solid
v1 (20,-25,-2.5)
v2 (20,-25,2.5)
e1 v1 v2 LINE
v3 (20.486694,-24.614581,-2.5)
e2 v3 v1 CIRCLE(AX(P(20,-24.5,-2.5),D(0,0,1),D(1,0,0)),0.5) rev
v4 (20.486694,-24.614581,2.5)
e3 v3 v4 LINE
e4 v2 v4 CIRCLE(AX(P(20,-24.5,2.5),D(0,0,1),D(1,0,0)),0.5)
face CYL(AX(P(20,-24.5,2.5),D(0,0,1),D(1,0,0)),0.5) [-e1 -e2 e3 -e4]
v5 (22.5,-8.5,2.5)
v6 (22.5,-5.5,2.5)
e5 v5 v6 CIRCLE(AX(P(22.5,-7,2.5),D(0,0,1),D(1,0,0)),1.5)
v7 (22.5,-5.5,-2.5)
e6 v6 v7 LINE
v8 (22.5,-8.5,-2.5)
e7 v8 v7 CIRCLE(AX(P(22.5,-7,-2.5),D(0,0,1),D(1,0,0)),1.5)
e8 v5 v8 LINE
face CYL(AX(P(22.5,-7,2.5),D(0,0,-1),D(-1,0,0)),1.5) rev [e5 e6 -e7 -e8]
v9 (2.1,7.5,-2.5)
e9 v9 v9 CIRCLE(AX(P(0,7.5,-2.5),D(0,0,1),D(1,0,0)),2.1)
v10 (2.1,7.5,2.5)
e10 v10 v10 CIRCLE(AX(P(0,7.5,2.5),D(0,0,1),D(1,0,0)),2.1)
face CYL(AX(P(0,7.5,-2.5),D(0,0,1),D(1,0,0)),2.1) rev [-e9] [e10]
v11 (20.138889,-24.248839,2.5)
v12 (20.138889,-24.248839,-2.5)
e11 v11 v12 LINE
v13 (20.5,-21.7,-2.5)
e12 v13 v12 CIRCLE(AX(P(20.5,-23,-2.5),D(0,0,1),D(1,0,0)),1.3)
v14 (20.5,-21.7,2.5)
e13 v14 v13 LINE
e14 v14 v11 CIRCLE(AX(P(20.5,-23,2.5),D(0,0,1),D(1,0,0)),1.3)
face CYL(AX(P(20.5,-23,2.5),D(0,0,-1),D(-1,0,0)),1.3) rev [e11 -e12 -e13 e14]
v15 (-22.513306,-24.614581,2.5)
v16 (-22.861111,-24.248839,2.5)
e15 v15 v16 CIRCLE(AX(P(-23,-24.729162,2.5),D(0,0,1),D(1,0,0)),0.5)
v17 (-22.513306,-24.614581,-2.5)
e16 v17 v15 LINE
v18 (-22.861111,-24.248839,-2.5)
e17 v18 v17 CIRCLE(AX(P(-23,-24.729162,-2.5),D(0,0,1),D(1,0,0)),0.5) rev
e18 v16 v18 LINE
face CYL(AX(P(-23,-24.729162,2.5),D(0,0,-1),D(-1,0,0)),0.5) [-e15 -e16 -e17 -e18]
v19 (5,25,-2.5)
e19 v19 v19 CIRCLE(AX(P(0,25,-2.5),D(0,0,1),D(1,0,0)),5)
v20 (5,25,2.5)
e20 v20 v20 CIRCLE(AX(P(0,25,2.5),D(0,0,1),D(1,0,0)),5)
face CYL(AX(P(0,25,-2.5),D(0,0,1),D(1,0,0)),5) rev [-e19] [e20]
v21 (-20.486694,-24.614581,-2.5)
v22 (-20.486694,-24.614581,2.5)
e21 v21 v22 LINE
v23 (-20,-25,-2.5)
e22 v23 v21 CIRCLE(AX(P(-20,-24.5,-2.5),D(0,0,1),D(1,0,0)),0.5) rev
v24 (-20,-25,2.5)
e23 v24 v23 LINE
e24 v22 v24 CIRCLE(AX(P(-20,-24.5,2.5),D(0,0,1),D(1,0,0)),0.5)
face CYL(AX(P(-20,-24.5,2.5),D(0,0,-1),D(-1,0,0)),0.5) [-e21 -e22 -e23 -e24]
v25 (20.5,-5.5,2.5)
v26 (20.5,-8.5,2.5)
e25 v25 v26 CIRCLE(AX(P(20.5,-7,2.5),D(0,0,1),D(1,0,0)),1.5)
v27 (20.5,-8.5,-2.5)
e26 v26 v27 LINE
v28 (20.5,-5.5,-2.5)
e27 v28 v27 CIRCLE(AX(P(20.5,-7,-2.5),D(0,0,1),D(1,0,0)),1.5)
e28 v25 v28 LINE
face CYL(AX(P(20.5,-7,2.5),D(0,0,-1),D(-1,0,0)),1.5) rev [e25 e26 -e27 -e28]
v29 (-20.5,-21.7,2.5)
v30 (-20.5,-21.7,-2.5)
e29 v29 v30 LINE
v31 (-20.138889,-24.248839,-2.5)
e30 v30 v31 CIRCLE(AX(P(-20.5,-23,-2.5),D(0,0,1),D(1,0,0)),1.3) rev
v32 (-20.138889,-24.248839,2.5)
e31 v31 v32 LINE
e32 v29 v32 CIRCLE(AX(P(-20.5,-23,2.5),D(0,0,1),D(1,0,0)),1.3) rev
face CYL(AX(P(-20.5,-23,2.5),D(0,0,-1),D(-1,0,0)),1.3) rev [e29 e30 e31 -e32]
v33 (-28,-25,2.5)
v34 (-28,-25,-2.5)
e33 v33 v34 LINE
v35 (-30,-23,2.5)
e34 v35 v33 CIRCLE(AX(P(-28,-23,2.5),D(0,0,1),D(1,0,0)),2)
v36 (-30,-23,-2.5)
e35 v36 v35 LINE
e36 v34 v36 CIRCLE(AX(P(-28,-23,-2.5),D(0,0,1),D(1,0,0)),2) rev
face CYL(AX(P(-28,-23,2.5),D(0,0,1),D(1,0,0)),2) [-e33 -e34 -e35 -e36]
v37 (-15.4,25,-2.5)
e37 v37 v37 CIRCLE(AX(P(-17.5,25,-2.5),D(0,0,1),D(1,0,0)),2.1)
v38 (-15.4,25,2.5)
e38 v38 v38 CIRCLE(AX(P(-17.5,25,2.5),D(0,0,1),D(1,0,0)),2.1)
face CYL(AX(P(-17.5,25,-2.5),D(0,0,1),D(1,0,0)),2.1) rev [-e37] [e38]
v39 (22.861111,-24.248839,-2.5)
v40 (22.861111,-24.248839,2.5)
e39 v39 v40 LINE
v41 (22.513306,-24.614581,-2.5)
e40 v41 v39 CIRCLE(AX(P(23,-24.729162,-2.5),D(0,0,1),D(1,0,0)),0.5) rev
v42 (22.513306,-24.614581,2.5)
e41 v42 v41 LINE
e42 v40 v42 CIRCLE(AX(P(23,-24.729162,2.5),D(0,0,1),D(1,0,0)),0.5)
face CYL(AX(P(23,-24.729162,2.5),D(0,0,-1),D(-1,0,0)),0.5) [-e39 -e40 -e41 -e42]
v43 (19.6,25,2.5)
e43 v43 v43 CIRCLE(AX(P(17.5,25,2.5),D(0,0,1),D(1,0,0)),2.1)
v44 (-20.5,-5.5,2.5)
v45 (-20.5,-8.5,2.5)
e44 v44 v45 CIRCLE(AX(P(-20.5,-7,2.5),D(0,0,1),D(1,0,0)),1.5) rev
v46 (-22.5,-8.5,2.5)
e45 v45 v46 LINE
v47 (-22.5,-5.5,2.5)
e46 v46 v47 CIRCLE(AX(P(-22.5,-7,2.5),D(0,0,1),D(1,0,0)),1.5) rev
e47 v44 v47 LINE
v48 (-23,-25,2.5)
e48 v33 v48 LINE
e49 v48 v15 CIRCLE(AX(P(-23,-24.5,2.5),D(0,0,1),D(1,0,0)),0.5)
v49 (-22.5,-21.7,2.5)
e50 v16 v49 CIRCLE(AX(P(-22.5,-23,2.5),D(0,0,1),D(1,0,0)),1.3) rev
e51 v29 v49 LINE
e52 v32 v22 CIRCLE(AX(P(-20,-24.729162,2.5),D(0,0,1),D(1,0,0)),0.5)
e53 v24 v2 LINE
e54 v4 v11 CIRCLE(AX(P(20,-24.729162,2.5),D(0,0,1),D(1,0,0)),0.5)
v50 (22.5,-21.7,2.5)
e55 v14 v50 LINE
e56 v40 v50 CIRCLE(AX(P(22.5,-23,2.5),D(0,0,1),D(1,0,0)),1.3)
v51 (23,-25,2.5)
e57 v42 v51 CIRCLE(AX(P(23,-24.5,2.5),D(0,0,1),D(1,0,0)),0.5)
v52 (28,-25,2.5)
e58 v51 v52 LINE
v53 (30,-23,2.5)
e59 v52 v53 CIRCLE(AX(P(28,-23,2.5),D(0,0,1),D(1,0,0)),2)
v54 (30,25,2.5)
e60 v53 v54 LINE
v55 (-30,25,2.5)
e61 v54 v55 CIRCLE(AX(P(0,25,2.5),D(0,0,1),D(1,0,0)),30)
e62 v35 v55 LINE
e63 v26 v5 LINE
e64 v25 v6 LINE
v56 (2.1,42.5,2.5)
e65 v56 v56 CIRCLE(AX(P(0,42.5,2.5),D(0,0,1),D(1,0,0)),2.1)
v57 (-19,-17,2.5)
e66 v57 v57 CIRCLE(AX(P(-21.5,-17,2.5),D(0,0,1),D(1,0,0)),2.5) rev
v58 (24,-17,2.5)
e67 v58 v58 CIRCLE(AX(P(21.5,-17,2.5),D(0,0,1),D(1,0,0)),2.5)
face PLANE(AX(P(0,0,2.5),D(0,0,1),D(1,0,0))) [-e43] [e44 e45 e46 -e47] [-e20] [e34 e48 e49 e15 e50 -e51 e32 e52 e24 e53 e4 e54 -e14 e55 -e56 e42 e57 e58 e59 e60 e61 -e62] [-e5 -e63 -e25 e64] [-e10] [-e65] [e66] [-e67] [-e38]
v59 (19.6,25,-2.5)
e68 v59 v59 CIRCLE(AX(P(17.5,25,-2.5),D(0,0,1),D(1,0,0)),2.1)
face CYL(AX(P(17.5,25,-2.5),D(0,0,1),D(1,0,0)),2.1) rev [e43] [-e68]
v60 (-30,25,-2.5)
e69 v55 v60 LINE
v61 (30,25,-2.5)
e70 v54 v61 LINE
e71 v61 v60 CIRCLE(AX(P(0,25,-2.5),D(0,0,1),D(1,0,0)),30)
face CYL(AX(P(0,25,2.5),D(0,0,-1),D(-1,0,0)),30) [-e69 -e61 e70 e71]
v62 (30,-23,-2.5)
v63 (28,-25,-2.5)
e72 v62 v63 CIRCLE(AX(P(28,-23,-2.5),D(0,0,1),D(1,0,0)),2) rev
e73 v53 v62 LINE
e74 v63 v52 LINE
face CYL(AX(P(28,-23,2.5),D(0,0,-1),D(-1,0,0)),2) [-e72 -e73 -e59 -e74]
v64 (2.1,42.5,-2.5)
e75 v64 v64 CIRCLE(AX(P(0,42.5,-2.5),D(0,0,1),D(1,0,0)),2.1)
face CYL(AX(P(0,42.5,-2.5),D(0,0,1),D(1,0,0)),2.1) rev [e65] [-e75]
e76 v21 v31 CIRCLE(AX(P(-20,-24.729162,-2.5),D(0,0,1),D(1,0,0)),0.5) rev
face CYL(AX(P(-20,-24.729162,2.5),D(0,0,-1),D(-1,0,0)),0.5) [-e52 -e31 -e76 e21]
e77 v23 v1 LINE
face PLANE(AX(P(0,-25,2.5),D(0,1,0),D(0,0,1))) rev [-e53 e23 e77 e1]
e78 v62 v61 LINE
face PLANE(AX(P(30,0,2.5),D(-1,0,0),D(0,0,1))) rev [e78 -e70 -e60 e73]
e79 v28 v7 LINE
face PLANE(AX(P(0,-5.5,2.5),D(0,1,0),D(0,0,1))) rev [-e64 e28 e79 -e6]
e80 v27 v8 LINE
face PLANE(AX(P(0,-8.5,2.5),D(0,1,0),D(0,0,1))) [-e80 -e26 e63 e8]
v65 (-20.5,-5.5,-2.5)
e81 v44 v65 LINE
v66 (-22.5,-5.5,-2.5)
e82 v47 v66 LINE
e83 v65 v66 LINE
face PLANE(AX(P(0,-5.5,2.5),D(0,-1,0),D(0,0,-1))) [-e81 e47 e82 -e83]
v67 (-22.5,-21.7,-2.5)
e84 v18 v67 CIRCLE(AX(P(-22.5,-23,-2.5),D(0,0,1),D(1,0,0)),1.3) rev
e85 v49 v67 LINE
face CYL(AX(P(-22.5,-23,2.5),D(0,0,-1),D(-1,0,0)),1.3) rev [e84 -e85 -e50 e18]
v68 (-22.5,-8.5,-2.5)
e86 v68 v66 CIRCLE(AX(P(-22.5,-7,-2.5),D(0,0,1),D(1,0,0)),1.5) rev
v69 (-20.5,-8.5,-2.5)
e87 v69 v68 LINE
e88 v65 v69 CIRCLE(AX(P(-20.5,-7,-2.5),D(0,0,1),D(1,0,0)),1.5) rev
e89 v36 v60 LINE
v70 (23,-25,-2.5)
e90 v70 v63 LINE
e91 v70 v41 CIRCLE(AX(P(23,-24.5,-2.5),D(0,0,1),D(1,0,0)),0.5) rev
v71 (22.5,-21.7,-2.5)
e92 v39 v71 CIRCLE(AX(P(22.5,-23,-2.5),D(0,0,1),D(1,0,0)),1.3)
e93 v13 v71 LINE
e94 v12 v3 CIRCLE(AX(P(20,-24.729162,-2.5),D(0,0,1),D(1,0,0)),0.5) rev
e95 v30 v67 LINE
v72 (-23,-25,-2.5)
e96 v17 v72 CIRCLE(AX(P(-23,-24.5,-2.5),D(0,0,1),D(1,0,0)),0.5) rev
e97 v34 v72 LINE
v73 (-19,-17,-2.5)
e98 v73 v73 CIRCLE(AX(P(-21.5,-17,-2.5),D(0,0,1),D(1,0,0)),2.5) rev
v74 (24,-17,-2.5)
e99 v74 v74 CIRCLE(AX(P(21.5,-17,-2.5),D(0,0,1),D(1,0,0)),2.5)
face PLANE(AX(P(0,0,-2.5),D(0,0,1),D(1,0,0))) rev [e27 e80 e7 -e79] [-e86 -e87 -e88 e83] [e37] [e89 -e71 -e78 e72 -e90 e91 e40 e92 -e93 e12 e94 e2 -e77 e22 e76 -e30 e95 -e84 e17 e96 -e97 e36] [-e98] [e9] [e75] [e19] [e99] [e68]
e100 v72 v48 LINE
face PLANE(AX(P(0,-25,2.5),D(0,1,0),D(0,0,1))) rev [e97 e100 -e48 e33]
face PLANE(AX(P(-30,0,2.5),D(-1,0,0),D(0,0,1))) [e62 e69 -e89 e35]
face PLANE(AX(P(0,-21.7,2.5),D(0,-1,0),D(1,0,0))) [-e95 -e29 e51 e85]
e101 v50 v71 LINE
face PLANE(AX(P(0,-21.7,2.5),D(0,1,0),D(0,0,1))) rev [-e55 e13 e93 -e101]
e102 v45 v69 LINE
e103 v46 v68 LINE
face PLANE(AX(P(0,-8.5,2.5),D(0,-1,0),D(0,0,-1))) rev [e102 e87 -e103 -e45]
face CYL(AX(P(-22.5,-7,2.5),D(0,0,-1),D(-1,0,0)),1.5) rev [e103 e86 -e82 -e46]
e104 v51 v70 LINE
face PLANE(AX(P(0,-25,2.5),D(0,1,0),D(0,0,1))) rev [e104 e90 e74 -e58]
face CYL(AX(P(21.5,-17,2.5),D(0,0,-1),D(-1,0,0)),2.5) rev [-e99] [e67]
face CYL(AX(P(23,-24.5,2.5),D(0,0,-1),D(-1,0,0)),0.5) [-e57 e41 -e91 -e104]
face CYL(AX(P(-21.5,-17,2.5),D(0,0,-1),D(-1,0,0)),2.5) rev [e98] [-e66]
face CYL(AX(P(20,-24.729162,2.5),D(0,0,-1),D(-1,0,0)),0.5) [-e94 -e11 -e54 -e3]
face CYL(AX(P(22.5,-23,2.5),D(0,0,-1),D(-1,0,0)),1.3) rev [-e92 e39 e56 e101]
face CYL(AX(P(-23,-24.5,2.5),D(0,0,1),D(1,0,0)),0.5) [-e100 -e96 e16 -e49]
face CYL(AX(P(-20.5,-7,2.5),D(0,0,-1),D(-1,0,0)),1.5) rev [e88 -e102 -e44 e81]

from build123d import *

# Parameters (mm, degrees)
SKETCH1_R           = 2.5
BOSS_EXTRUDE1_DEPTH = 2.5
SKETCH2_R           = 5
CUT_EXTRUDE1_DEPTH  = 5
FILLET1_R           = 0.5
FILLET2_R           = 2


with BuildPart() as part:
    # Sketch1 → Boss-Extrude1 (new, symmetric)
    # profile 1 of 2: a face of its own
    with BuildSketch(Plane.XY):
        with BuildLine():
            Line((-30, 25), (-30, -25))
            Line((-30, -25), (-22.5, -25))
            Line((-22.5, -25), (-22.5, -24.3))
            ThreePointArc((-22.5, -24.3), (-23.8, -23), (-22.5, -21.7))
            Line((-22.5, -21.7), (-20.5, -21.7))
            ThreePointArc((-20.5, -21.7), (-19.2, -23), (-20.5, -24.3))
            Line((-20.5, -24.3), (-20.5, -25))
            Line((-20.5, -25), (20.5, -25))
            Line((20.5, -25), (20.5, -24.3))
            ThreePointArc((20.5, -24.3), (19.2, -23), (20.5, -21.7))
            Line((20.5, -21.7), (22.5, -21.7))
            ThreePointArc((22.5, -21.7), (23.8, -23), (22.5, -24.3))
            Line((22.5, -24.3), (22.5, -25))
            Line((22.5, -25), (30, -25))
            Line((30, -25), (30, 25))
            Line((30, 25), (-30, 25))
        make_face()
        with Locations((-21.5, -17)):
            Circle(SKETCH1_R, mode=Mode.SUBTRACT)
        with BuildLine():
            Line((-22.5, -5.5), (-20.5, -5.5))
            ThreePointArc((-20.5, -5.5), (-19, -7), (-20.5, -8.5))
            Line((-20.5, -8.5), (-22.5, -8.5))
            ThreePointArc((-22.5, -8.5), (-24, -7), (-22.5, -5.5))
        make_face(mode=Mode.SUBTRACT)
        with Locations((21.5, -17)):
            Circle(SKETCH1_R, mode=Mode.SUBTRACT)
        with BuildLine():
            ThreePointArc((20.5, -8.5), (19, -7), (20.5, -5.5))
            Line((20.5, -5.5), (22.5, -5.5))
            ThreePointArc((22.5, -5.5), (24, -7), (22.5, -8.5))
            Line((22.5, -8.5), (20.5, -8.5))
        make_face(mode=Mode.SUBTRACT)
    # profile 2 of 2: a face of its own
    with BuildSketch(Plane.XY):
        with BuildLine():
            ThreePointArc((30, 25), (0, 55), (-30, 25))
            Line((-30, 25), (30, 25))
        make_face()
    extrude(amount=BOSS_EXTRUDE1_DEPTH, both=True)

    # Sketch2 → Cut-Extrude1 (cut)
    with BuildSketch(Plane.XY.offset(2.5)):
        with Locations((0, 25)):
            Circle(SKETCH2_R)
        with BuildLine():
            ThreePointArc((-17.5, 27.1), (-19.6, 25), (-17.5, 22.9))
            Line((-17.5, 22.9), (-17.5, 27.1))
        make_face()
        with BuildLine():
            Line((-17.5, 27.1), (-17.5, 22.9))
            ThreePointArc((-17.5, 22.9), (-16.01507576, 23.51507576), (-15.4, 25))
            ThreePointArc((-15.4, 25), (-16.01507576, 26.48492424), (-17.5, 27.1))
        make_face()
        with BuildLine():
            ThreePointArc((17.5, 27.1), (15.4, 25), (17.5, 22.9))
            Line((17.5, 22.9), (17.5, 27.1))
        make_face()
        with BuildLine():
            Line((17.5, 27.1), (17.5, 22.9))
            ThreePointArc((17.5, 22.9), (18.98492424, 23.51507576), (19.6, 25))
            ThreePointArc((19.6, 25), (18.98492424, 26.48492424), (17.5, 27.1))
        make_face()
        with BuildLine():
            ThreePointArc((-2.1, 42.5), (0, 40.4), (2.1, 42.5))
            Line((2.1, 42.5), (-2.1, 42.5))
        make_face()
        with BuildLine():
            Line((-2.1, 42.5), (2.1, 42.5))
            ThreePointArc((2.1, 42.5), (0, 44.6), (-2.1, 42.5))
        make_face()
        with BuildLine():
            ThreePointArc((-2.1, 7.5), (0, 5.4), (2.1, 7.5))
            Line((2.1, 7.5), (-2.1, 7.5))
        make_face()
        with BuildLine():
            Line((-2.1, 7.5), (2.1, 7.5))
            ThreePointArc((2.1, 7.5), (0, 9.6), (-2.1, 7.5))
        make_face()
    extrude(amount=-CUT_EXTRUDE1_DEPTH, mode=Mode.SUBTRACT)

    # Fillet1
    # the kernel refuses this fillet: 0.5 mm, written as the material it takes off along each edge
    with BuildSketch(Plane(origin=(22.5, -25, -3.75), x_dir=(1, 0, 0), z_dir=(0, 0, 1))) as fillet1_piece_1:
        with BuildLine():
            CenterArc((FILLET1_R, FILLET1_R), FILLET1_R, 180, 90)
            Line((0, FILLET1_R), (0, 0))
            Line((0, 0), (FILLET1_R, 0))
        make_face()
    extrude(amount=7.5, mode=Mode.SUBTRACT)
    with BuildSketch(Plane(origin=(20.5, -25, -3.75), x_dir=(-1, 0, 0), z_dir=(0, 0, 1)), Plane(origin=(-20.5, -25, -3.75), x_dir=(0, 1, 0), z_dir=(0, 0, 1)), Plane(origin=(-22.5, -25, -3.75), x_dir=(-1, 0, 0), z_dir=(0, 0, 1))) as fillet1_piece_2:
        with BuildLine():
            CenterArc((FILLET1_R, -FILLET1_R), FILLET1_R, 90, 90)
            Line((0, -FILLET1_R), (0, 0))
            Line((0, 0), (FILLET1_R, 0))
        make_face()
    extrude(amount=7.5, mode=Mode.SUBTRACT)
    with BuildSketch(Plane(origin=(22.5, -24.3, -3.572904116), x_dir=(0, -1, 0), z_dir=(0, 0, 1))) as fillet1_piece_3:
        with BuildLine():
            CenterArc((0.429161647, 0.5), FILLET1_R, 196.127620213, 73.872379787)
            ThreePointArc((-0.051161033, 0.361111111), (-0.012853805, 0.182358634), (0, 0))
            Line((0, 0), (0.429161647, 0))
        make_face()
    extrude(amount=7.145808233, mode=Mode.SUBTRACT)
    with BuildSketch(Plane(origin=(20.5, -24.3, -3.572904116), x_dir=(-0.9901124580598394, 0.1402758724610287, 0), z_dir=(0, 0, 1))) as fillet1_piece_4:
        with BuildLine():
            CenterArc((0.434855205, 0.495056229), FILLET1_R, 188.063810107, 73.872379787)
            Line((-0.060201024, 0.424918293), (0, 0))
            ThreePointArc((0, 0), (0.182358634, 0.012853805), (0.364717268, 0))
        make_face()
    extrude(amount=7.145808233, mode=Mode.SUBTRACT)
    with BuildSketch(Plane(origin=(-20.5, -24.3, -3.572904116), x_dir=(0.9901124580598384, 0.14027587246103554, 0), z_dir=(0, 0, 1))) as fillet1_piece_5:
        with BuildLine():
            CenterArc((0.434855205, -0.495056229), FILLET1_R, 98.063810107, 73.872379787)
            Line((-0.060201024, -0.424918293), (0, 0))
            ThreePointArc((0, 0), (0.182358634, -0.012853805), (0.364717268, 0))
        make_face()
    extrude(amount=7.145808233, mode=Mode.SUBTRACT)
    with BuildSketch(Plane(origin=(-22.5, -24.3, -3.572904116), x_dir=(0, -1, 0), z_dir=(0, 0, 1))) as fillet1_piece_6:
        with BuildLine():
            CenterArc((0.429161647, -0.5), FILLET1_R, 90, 73.872379787)
            ThreePointArc((-0.051161033, -0.361111111), (-0.012853805, -0.182358634), (0, 0))
            Line((0, 0), (0.429161647, 0))
        make_face()
    extrude(amount=7.145808233, mode=Mode.SUBTRACT)

    # Fillet2
    fillet2_edges = [part.edges().sort_by_distance(p)[0] for p in [
        (-30, -25, 0),
        (30, -25, 0),
    ]]
    fillet(fillet2_edges, radius=FILLET2_R)


solid = part.part
